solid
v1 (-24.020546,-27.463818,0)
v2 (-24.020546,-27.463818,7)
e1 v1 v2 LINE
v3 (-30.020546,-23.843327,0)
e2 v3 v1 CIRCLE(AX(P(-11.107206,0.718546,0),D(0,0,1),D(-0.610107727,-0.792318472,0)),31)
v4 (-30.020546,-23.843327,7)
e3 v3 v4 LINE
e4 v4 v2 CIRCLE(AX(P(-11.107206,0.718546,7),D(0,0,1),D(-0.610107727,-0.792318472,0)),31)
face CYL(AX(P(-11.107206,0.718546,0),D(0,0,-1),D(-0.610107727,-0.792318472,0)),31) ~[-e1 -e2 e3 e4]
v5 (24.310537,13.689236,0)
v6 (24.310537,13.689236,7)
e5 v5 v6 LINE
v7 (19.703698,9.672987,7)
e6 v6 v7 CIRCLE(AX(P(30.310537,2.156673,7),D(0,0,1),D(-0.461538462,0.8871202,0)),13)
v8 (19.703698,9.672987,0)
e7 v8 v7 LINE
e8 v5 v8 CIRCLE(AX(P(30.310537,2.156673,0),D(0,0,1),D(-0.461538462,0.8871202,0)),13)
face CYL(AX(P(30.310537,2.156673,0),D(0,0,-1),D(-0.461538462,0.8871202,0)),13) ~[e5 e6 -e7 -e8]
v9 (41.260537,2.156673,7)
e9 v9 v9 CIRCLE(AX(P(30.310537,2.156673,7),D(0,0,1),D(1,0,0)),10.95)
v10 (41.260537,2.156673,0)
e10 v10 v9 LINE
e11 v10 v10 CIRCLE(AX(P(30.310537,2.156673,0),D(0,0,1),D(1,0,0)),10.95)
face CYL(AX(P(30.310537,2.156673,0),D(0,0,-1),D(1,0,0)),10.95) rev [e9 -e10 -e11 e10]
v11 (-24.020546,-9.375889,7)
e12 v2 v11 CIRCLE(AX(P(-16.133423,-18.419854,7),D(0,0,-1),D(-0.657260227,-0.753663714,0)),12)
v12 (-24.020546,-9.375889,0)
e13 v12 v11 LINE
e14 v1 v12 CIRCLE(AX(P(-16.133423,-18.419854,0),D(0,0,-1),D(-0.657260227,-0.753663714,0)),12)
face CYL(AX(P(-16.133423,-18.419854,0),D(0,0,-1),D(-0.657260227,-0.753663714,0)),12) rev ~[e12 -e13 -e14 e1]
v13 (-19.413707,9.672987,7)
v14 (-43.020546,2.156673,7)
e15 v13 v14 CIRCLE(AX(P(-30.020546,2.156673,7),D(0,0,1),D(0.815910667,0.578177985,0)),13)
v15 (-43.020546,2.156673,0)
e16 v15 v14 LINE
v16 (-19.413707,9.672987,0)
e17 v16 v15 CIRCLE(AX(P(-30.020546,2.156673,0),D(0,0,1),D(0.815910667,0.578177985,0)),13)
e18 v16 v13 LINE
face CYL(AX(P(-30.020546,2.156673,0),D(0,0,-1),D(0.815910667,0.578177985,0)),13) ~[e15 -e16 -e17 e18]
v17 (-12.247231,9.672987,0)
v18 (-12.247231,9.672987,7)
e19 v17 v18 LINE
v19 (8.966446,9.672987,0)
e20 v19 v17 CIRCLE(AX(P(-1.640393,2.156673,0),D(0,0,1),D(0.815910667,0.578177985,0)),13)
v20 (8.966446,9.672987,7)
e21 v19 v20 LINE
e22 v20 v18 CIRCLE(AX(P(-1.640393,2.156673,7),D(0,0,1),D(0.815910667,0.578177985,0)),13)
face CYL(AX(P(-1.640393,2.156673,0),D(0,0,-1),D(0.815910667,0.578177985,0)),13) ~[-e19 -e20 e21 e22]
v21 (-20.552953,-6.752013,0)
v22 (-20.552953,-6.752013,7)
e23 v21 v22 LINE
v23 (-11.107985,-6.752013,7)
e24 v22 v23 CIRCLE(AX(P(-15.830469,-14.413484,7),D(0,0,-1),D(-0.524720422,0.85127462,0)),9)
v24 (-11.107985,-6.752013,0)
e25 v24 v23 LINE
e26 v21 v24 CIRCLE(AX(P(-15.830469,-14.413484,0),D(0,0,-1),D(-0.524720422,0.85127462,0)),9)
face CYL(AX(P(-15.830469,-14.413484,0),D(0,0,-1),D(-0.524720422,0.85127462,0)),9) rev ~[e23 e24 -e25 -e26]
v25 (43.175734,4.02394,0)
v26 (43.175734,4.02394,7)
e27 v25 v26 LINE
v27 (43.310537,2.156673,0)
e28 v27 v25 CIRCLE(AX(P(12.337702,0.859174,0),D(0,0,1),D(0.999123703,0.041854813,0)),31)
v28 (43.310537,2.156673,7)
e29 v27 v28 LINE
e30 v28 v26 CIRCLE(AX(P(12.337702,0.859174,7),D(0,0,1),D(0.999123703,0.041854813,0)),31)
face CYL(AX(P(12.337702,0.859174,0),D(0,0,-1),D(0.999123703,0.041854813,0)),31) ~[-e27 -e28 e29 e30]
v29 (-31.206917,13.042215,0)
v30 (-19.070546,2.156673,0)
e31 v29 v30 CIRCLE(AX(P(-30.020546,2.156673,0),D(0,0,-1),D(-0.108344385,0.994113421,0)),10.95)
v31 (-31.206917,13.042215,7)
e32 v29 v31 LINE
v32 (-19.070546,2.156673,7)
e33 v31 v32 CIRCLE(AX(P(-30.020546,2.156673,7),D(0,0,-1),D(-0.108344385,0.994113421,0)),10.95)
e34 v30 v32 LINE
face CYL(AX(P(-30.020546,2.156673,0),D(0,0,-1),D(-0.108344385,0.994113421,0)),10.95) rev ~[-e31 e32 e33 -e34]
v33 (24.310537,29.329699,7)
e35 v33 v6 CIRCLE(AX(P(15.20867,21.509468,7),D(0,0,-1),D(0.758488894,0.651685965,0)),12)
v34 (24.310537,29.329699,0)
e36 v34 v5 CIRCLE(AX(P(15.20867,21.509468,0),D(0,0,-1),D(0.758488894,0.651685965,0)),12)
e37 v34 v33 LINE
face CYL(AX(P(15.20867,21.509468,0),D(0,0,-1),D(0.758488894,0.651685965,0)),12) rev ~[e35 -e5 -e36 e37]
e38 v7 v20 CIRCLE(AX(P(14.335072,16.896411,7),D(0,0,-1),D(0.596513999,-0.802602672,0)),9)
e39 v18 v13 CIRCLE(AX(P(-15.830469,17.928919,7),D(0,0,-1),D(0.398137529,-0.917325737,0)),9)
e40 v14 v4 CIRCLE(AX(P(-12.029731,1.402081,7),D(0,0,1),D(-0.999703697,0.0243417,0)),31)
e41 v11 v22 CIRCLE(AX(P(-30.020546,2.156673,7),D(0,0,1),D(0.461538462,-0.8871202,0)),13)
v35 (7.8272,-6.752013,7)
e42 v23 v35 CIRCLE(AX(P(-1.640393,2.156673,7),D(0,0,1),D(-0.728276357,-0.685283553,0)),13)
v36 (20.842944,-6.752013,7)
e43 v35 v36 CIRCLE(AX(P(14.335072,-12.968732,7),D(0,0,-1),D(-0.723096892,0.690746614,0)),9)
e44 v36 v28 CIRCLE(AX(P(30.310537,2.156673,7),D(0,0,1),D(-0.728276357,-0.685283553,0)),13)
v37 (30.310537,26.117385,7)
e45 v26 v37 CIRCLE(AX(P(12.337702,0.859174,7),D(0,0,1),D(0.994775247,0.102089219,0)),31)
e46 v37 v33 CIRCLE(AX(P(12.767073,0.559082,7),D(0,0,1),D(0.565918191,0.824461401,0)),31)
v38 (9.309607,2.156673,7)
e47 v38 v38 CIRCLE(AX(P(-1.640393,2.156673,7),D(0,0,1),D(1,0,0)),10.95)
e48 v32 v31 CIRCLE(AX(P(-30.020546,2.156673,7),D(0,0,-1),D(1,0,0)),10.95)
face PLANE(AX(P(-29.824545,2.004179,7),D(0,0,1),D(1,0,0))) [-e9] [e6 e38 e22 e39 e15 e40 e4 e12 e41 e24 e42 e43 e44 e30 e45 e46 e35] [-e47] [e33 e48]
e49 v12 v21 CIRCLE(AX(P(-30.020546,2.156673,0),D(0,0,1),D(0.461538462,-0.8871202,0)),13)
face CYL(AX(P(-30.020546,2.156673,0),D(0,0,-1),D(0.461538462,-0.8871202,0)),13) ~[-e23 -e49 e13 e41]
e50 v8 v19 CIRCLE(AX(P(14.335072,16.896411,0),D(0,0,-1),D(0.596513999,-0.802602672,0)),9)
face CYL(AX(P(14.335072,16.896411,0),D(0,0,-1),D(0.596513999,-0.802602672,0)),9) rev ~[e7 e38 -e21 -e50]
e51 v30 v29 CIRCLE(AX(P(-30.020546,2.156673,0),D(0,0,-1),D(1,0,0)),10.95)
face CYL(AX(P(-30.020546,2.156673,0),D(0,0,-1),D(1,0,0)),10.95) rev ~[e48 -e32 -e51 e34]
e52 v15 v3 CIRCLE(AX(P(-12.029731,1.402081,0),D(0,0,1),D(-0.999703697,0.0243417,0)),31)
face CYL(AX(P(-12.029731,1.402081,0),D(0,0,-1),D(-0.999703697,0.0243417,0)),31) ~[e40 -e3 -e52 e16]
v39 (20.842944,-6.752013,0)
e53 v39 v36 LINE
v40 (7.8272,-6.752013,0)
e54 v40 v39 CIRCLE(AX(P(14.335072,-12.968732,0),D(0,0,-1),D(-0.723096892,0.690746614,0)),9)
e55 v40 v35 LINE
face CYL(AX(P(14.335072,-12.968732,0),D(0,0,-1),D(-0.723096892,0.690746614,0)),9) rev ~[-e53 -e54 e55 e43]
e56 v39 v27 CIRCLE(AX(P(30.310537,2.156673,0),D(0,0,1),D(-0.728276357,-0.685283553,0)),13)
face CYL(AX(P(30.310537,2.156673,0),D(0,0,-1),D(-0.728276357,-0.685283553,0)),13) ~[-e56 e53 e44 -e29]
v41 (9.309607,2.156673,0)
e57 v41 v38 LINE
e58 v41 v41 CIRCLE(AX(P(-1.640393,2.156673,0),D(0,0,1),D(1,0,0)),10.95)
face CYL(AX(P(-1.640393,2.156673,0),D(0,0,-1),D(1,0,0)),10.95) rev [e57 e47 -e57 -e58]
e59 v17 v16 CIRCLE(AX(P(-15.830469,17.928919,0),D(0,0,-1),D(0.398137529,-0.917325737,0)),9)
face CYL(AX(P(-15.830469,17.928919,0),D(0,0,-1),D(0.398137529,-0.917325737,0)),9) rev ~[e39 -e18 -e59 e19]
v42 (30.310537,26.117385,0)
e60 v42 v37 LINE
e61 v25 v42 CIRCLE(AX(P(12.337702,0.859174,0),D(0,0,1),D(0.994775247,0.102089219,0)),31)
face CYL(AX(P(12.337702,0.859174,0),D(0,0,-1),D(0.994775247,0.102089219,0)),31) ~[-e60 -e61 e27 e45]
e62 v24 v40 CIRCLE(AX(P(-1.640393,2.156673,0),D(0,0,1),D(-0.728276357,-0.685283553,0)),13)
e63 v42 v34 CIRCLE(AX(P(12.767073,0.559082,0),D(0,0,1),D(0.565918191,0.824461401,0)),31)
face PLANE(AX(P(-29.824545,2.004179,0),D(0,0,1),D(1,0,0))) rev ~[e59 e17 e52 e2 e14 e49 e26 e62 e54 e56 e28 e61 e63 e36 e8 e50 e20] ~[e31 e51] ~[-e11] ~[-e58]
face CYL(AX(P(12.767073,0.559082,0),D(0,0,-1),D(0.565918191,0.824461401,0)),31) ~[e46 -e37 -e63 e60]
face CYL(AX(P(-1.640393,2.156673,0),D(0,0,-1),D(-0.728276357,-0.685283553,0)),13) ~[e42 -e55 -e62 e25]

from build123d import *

# Parameters (mm, degrees)
F0_R     = 10.95
F1_DEPTH = 7


# Not quite as in the source:
# - a feature names something its author has since deleted; it is built from what else it names


with BuildPart() as f1:
    # F0 (on Top) → F1 (new body)
    with BuildSketch(Plane.XY):
        with BuildLine():
            ThreePointArc((-20.552952936, -6.752012725), (-17.9358713071, -2.6350535567), (-17.0205455745, 2.1566734649))
            ThreePointArc((-17.0205455745, 2.1566734649), (-17.6332758432, 6.1007257723), (-19.4137068981, 9.672987275))
            ThreePointArc((-19.4137068981, 9.672987275), (-33.9645978819, 14.5439431963), (-43.0205455745, 2.1566734649))
            ThreePointArc((-43.0205455745, 2.1566734649), (-36.7659143561, -8.9563819205), (-24.0205455745, -9.3758891297))
            ThreePointArc((-24.0205455745, -9.3758891297), (-22.176261837, -8.2099659445), (-20.552952936, -6.752012725))
        make_face()
        with BuildLine():
            ThreePointArc((-31.2069165924, 13.042215427), (-22.7091935329, 10.3081537797), (-19.0705455745, 2.1566734649))
            ThreePointArc((-19.0705455745, 2.1566734649), (-22.7091935329, -5.9948068499), (-31.2069165924, -8.7288684971))
            ThreePointArc((-31.2069165924, -8.7288684971), (-40.9705455745, 2.1566734649), (-31.2069165924, 13.042215427))
        make_face(mode=Mode.SUBTRACT)
        with BuildLine():
            ThreePointArc((-19.4137068981, 9.672987275), (-17.6332758432, 6.1007257723), (-17.0205455745, 2.1566734649))
            ThreePointArc((-17.0205455745, 2.1566734649), (-17.9358713071, -2.6350535567), (-20.552952936, -6.752012725))
            ThreePointArc((-20.552952936, -6.752012725), (-15.8304691356, -5.4134843039), (-11.1079853352, -6.752012725))
            ThreePointArc((-11.1079853352, -6.752012725), (-14.6092343722, 1.2571482598), (-12.2472313731, 9.672987275))
            ThreePointArc((-12.2472313731, 9.672987275), (-15.8304691356, 8.9289189085), (-19.4137068981, 9.672987275))
        make_face()
        with BuildLine():
            ThreePointArc((-24.0205455745, -9.3758891297), (-36.7659143561, -8.9563819205), (-43.0205455745, 2.1566734649))
            ThreePointArc((-43.0205455745, 2.1566734649), (-39.7569738909, -12.4615406932), (-30.0205455745, -23.8433265351))
            ThreePointArc((-30.0205455745, -23.8433265351), (-27.1231782319, -25.8236586783), (-24.0205455745, -27.4638182769))
            ThreePointArc((-24.0205455745, -27.4638182769), (-28.1334228551, -18.4198537033), (-24.0205455745, -9.3758891297))
        make_face()
        with BuildLine():
            ThreePointArc((8.9664459798, 9.672987275), (-1.6403926966, 15.1566734649), (-12.2472313731, 9.672987275))
            ThreePointArc((-12.2472313731, 9.672987275), (-14.6092343722, 1.2571482598), (-11.1079853352, -6.752012725))
            ThreePointArc((-11.1079853352, -6.752012725), (-1.6403926966, -10.8433265351), (7.8271999419, -6.752012725))
            ThreePointArc((7.8271999419, -6.752012725), (10.4442815708, -2.6350535567), (11.3596073034, 2.1566734649))
            ThreePointArc((11.3596073034, 2.1566734649), (10.7468770347, 6.1007257723), (8.9664459798, 9.672987275))
        make_face()
        with Locations((-1.6403926966, 2.1566734649)):
            Circle(F0_R, mode=Mode.SUBTRACT)
        with BuildLine():
            ThreePointArc((19.7036979596, 9.672987275), (14.3350719697, 7.8964113233), (8.9664459798, 9.672987275))
            ThreePointArc((8.9664459798, 9.672987275), (10.7468770347, 6.1007257723), (11.3596073034, 2.1566734649))
            ThreePointArc((11.3596073034, 2.1566734649), (10.4442815708, -2.6350535567), (7.8271999419, -6.752012725))
            ThreePointArc((7.8271999419, -6.752012725), (14.3350719697, -3.9687322514), (20.8429439975, -6.752012725))
            ThreePointArc((20.8429439975, -6.752012725), (17.3416949605, 1.2571482598), (19.7036979596, 9.672987275))
        make_face()
        with BuildLine():
            ThreePointArc((24.310536636, 13.6892360596), (21.767742229, 11.9556868703), (19.7036979596, 9.672987275))
            ThreePointArc((19.7036979596, 9.672987275), (17.3416949605, 1.2571482598), (20.8429439975, -6.752012725))
            ThreePointArc((20.8429439975, -6.752012725), (35.1022636576, -9.9280008025), (43.310536636, 2.1566734649))
            ThreePointArc((43.310536636, 2.1566734649), (43.2572345725, 3.0913245901), (43.1757344795, 4.0239400363))
            ThreePointArc((43.1757344795, 4.0239400363), (36.2382024635, 13.7265817549), (24.310536636, 13.6892360596))
        make_face()
        with Locations((30.310536636, 2.1566734649)):
            Circle(F0_R, mode=Mode.SUBTRACT)
        with BuildLine():
            ThreePointArc((24.310536636, 29.3296992304), (27.2086699071, 21.509467645), (24.310536636, 13.6892360596))
            ThreePointArc((24.310536636, 13.6892360596), (36.2382024635, 13.7265817549), (43.1757344795, 4.0239400363))
            ThreePointArc((43.1757344795, 4.0239400363), (39.126790521, 16.45868474), (30.310536636, 26.1173849869))
            ThreePointArc((30.310536636, 26.1173849869), (27.3989585648, 27.8886976733), (24.310536636, 29.3296992304))
        make_face()
    extrude(amount=F1_DEPTH)


solid = f1.part
